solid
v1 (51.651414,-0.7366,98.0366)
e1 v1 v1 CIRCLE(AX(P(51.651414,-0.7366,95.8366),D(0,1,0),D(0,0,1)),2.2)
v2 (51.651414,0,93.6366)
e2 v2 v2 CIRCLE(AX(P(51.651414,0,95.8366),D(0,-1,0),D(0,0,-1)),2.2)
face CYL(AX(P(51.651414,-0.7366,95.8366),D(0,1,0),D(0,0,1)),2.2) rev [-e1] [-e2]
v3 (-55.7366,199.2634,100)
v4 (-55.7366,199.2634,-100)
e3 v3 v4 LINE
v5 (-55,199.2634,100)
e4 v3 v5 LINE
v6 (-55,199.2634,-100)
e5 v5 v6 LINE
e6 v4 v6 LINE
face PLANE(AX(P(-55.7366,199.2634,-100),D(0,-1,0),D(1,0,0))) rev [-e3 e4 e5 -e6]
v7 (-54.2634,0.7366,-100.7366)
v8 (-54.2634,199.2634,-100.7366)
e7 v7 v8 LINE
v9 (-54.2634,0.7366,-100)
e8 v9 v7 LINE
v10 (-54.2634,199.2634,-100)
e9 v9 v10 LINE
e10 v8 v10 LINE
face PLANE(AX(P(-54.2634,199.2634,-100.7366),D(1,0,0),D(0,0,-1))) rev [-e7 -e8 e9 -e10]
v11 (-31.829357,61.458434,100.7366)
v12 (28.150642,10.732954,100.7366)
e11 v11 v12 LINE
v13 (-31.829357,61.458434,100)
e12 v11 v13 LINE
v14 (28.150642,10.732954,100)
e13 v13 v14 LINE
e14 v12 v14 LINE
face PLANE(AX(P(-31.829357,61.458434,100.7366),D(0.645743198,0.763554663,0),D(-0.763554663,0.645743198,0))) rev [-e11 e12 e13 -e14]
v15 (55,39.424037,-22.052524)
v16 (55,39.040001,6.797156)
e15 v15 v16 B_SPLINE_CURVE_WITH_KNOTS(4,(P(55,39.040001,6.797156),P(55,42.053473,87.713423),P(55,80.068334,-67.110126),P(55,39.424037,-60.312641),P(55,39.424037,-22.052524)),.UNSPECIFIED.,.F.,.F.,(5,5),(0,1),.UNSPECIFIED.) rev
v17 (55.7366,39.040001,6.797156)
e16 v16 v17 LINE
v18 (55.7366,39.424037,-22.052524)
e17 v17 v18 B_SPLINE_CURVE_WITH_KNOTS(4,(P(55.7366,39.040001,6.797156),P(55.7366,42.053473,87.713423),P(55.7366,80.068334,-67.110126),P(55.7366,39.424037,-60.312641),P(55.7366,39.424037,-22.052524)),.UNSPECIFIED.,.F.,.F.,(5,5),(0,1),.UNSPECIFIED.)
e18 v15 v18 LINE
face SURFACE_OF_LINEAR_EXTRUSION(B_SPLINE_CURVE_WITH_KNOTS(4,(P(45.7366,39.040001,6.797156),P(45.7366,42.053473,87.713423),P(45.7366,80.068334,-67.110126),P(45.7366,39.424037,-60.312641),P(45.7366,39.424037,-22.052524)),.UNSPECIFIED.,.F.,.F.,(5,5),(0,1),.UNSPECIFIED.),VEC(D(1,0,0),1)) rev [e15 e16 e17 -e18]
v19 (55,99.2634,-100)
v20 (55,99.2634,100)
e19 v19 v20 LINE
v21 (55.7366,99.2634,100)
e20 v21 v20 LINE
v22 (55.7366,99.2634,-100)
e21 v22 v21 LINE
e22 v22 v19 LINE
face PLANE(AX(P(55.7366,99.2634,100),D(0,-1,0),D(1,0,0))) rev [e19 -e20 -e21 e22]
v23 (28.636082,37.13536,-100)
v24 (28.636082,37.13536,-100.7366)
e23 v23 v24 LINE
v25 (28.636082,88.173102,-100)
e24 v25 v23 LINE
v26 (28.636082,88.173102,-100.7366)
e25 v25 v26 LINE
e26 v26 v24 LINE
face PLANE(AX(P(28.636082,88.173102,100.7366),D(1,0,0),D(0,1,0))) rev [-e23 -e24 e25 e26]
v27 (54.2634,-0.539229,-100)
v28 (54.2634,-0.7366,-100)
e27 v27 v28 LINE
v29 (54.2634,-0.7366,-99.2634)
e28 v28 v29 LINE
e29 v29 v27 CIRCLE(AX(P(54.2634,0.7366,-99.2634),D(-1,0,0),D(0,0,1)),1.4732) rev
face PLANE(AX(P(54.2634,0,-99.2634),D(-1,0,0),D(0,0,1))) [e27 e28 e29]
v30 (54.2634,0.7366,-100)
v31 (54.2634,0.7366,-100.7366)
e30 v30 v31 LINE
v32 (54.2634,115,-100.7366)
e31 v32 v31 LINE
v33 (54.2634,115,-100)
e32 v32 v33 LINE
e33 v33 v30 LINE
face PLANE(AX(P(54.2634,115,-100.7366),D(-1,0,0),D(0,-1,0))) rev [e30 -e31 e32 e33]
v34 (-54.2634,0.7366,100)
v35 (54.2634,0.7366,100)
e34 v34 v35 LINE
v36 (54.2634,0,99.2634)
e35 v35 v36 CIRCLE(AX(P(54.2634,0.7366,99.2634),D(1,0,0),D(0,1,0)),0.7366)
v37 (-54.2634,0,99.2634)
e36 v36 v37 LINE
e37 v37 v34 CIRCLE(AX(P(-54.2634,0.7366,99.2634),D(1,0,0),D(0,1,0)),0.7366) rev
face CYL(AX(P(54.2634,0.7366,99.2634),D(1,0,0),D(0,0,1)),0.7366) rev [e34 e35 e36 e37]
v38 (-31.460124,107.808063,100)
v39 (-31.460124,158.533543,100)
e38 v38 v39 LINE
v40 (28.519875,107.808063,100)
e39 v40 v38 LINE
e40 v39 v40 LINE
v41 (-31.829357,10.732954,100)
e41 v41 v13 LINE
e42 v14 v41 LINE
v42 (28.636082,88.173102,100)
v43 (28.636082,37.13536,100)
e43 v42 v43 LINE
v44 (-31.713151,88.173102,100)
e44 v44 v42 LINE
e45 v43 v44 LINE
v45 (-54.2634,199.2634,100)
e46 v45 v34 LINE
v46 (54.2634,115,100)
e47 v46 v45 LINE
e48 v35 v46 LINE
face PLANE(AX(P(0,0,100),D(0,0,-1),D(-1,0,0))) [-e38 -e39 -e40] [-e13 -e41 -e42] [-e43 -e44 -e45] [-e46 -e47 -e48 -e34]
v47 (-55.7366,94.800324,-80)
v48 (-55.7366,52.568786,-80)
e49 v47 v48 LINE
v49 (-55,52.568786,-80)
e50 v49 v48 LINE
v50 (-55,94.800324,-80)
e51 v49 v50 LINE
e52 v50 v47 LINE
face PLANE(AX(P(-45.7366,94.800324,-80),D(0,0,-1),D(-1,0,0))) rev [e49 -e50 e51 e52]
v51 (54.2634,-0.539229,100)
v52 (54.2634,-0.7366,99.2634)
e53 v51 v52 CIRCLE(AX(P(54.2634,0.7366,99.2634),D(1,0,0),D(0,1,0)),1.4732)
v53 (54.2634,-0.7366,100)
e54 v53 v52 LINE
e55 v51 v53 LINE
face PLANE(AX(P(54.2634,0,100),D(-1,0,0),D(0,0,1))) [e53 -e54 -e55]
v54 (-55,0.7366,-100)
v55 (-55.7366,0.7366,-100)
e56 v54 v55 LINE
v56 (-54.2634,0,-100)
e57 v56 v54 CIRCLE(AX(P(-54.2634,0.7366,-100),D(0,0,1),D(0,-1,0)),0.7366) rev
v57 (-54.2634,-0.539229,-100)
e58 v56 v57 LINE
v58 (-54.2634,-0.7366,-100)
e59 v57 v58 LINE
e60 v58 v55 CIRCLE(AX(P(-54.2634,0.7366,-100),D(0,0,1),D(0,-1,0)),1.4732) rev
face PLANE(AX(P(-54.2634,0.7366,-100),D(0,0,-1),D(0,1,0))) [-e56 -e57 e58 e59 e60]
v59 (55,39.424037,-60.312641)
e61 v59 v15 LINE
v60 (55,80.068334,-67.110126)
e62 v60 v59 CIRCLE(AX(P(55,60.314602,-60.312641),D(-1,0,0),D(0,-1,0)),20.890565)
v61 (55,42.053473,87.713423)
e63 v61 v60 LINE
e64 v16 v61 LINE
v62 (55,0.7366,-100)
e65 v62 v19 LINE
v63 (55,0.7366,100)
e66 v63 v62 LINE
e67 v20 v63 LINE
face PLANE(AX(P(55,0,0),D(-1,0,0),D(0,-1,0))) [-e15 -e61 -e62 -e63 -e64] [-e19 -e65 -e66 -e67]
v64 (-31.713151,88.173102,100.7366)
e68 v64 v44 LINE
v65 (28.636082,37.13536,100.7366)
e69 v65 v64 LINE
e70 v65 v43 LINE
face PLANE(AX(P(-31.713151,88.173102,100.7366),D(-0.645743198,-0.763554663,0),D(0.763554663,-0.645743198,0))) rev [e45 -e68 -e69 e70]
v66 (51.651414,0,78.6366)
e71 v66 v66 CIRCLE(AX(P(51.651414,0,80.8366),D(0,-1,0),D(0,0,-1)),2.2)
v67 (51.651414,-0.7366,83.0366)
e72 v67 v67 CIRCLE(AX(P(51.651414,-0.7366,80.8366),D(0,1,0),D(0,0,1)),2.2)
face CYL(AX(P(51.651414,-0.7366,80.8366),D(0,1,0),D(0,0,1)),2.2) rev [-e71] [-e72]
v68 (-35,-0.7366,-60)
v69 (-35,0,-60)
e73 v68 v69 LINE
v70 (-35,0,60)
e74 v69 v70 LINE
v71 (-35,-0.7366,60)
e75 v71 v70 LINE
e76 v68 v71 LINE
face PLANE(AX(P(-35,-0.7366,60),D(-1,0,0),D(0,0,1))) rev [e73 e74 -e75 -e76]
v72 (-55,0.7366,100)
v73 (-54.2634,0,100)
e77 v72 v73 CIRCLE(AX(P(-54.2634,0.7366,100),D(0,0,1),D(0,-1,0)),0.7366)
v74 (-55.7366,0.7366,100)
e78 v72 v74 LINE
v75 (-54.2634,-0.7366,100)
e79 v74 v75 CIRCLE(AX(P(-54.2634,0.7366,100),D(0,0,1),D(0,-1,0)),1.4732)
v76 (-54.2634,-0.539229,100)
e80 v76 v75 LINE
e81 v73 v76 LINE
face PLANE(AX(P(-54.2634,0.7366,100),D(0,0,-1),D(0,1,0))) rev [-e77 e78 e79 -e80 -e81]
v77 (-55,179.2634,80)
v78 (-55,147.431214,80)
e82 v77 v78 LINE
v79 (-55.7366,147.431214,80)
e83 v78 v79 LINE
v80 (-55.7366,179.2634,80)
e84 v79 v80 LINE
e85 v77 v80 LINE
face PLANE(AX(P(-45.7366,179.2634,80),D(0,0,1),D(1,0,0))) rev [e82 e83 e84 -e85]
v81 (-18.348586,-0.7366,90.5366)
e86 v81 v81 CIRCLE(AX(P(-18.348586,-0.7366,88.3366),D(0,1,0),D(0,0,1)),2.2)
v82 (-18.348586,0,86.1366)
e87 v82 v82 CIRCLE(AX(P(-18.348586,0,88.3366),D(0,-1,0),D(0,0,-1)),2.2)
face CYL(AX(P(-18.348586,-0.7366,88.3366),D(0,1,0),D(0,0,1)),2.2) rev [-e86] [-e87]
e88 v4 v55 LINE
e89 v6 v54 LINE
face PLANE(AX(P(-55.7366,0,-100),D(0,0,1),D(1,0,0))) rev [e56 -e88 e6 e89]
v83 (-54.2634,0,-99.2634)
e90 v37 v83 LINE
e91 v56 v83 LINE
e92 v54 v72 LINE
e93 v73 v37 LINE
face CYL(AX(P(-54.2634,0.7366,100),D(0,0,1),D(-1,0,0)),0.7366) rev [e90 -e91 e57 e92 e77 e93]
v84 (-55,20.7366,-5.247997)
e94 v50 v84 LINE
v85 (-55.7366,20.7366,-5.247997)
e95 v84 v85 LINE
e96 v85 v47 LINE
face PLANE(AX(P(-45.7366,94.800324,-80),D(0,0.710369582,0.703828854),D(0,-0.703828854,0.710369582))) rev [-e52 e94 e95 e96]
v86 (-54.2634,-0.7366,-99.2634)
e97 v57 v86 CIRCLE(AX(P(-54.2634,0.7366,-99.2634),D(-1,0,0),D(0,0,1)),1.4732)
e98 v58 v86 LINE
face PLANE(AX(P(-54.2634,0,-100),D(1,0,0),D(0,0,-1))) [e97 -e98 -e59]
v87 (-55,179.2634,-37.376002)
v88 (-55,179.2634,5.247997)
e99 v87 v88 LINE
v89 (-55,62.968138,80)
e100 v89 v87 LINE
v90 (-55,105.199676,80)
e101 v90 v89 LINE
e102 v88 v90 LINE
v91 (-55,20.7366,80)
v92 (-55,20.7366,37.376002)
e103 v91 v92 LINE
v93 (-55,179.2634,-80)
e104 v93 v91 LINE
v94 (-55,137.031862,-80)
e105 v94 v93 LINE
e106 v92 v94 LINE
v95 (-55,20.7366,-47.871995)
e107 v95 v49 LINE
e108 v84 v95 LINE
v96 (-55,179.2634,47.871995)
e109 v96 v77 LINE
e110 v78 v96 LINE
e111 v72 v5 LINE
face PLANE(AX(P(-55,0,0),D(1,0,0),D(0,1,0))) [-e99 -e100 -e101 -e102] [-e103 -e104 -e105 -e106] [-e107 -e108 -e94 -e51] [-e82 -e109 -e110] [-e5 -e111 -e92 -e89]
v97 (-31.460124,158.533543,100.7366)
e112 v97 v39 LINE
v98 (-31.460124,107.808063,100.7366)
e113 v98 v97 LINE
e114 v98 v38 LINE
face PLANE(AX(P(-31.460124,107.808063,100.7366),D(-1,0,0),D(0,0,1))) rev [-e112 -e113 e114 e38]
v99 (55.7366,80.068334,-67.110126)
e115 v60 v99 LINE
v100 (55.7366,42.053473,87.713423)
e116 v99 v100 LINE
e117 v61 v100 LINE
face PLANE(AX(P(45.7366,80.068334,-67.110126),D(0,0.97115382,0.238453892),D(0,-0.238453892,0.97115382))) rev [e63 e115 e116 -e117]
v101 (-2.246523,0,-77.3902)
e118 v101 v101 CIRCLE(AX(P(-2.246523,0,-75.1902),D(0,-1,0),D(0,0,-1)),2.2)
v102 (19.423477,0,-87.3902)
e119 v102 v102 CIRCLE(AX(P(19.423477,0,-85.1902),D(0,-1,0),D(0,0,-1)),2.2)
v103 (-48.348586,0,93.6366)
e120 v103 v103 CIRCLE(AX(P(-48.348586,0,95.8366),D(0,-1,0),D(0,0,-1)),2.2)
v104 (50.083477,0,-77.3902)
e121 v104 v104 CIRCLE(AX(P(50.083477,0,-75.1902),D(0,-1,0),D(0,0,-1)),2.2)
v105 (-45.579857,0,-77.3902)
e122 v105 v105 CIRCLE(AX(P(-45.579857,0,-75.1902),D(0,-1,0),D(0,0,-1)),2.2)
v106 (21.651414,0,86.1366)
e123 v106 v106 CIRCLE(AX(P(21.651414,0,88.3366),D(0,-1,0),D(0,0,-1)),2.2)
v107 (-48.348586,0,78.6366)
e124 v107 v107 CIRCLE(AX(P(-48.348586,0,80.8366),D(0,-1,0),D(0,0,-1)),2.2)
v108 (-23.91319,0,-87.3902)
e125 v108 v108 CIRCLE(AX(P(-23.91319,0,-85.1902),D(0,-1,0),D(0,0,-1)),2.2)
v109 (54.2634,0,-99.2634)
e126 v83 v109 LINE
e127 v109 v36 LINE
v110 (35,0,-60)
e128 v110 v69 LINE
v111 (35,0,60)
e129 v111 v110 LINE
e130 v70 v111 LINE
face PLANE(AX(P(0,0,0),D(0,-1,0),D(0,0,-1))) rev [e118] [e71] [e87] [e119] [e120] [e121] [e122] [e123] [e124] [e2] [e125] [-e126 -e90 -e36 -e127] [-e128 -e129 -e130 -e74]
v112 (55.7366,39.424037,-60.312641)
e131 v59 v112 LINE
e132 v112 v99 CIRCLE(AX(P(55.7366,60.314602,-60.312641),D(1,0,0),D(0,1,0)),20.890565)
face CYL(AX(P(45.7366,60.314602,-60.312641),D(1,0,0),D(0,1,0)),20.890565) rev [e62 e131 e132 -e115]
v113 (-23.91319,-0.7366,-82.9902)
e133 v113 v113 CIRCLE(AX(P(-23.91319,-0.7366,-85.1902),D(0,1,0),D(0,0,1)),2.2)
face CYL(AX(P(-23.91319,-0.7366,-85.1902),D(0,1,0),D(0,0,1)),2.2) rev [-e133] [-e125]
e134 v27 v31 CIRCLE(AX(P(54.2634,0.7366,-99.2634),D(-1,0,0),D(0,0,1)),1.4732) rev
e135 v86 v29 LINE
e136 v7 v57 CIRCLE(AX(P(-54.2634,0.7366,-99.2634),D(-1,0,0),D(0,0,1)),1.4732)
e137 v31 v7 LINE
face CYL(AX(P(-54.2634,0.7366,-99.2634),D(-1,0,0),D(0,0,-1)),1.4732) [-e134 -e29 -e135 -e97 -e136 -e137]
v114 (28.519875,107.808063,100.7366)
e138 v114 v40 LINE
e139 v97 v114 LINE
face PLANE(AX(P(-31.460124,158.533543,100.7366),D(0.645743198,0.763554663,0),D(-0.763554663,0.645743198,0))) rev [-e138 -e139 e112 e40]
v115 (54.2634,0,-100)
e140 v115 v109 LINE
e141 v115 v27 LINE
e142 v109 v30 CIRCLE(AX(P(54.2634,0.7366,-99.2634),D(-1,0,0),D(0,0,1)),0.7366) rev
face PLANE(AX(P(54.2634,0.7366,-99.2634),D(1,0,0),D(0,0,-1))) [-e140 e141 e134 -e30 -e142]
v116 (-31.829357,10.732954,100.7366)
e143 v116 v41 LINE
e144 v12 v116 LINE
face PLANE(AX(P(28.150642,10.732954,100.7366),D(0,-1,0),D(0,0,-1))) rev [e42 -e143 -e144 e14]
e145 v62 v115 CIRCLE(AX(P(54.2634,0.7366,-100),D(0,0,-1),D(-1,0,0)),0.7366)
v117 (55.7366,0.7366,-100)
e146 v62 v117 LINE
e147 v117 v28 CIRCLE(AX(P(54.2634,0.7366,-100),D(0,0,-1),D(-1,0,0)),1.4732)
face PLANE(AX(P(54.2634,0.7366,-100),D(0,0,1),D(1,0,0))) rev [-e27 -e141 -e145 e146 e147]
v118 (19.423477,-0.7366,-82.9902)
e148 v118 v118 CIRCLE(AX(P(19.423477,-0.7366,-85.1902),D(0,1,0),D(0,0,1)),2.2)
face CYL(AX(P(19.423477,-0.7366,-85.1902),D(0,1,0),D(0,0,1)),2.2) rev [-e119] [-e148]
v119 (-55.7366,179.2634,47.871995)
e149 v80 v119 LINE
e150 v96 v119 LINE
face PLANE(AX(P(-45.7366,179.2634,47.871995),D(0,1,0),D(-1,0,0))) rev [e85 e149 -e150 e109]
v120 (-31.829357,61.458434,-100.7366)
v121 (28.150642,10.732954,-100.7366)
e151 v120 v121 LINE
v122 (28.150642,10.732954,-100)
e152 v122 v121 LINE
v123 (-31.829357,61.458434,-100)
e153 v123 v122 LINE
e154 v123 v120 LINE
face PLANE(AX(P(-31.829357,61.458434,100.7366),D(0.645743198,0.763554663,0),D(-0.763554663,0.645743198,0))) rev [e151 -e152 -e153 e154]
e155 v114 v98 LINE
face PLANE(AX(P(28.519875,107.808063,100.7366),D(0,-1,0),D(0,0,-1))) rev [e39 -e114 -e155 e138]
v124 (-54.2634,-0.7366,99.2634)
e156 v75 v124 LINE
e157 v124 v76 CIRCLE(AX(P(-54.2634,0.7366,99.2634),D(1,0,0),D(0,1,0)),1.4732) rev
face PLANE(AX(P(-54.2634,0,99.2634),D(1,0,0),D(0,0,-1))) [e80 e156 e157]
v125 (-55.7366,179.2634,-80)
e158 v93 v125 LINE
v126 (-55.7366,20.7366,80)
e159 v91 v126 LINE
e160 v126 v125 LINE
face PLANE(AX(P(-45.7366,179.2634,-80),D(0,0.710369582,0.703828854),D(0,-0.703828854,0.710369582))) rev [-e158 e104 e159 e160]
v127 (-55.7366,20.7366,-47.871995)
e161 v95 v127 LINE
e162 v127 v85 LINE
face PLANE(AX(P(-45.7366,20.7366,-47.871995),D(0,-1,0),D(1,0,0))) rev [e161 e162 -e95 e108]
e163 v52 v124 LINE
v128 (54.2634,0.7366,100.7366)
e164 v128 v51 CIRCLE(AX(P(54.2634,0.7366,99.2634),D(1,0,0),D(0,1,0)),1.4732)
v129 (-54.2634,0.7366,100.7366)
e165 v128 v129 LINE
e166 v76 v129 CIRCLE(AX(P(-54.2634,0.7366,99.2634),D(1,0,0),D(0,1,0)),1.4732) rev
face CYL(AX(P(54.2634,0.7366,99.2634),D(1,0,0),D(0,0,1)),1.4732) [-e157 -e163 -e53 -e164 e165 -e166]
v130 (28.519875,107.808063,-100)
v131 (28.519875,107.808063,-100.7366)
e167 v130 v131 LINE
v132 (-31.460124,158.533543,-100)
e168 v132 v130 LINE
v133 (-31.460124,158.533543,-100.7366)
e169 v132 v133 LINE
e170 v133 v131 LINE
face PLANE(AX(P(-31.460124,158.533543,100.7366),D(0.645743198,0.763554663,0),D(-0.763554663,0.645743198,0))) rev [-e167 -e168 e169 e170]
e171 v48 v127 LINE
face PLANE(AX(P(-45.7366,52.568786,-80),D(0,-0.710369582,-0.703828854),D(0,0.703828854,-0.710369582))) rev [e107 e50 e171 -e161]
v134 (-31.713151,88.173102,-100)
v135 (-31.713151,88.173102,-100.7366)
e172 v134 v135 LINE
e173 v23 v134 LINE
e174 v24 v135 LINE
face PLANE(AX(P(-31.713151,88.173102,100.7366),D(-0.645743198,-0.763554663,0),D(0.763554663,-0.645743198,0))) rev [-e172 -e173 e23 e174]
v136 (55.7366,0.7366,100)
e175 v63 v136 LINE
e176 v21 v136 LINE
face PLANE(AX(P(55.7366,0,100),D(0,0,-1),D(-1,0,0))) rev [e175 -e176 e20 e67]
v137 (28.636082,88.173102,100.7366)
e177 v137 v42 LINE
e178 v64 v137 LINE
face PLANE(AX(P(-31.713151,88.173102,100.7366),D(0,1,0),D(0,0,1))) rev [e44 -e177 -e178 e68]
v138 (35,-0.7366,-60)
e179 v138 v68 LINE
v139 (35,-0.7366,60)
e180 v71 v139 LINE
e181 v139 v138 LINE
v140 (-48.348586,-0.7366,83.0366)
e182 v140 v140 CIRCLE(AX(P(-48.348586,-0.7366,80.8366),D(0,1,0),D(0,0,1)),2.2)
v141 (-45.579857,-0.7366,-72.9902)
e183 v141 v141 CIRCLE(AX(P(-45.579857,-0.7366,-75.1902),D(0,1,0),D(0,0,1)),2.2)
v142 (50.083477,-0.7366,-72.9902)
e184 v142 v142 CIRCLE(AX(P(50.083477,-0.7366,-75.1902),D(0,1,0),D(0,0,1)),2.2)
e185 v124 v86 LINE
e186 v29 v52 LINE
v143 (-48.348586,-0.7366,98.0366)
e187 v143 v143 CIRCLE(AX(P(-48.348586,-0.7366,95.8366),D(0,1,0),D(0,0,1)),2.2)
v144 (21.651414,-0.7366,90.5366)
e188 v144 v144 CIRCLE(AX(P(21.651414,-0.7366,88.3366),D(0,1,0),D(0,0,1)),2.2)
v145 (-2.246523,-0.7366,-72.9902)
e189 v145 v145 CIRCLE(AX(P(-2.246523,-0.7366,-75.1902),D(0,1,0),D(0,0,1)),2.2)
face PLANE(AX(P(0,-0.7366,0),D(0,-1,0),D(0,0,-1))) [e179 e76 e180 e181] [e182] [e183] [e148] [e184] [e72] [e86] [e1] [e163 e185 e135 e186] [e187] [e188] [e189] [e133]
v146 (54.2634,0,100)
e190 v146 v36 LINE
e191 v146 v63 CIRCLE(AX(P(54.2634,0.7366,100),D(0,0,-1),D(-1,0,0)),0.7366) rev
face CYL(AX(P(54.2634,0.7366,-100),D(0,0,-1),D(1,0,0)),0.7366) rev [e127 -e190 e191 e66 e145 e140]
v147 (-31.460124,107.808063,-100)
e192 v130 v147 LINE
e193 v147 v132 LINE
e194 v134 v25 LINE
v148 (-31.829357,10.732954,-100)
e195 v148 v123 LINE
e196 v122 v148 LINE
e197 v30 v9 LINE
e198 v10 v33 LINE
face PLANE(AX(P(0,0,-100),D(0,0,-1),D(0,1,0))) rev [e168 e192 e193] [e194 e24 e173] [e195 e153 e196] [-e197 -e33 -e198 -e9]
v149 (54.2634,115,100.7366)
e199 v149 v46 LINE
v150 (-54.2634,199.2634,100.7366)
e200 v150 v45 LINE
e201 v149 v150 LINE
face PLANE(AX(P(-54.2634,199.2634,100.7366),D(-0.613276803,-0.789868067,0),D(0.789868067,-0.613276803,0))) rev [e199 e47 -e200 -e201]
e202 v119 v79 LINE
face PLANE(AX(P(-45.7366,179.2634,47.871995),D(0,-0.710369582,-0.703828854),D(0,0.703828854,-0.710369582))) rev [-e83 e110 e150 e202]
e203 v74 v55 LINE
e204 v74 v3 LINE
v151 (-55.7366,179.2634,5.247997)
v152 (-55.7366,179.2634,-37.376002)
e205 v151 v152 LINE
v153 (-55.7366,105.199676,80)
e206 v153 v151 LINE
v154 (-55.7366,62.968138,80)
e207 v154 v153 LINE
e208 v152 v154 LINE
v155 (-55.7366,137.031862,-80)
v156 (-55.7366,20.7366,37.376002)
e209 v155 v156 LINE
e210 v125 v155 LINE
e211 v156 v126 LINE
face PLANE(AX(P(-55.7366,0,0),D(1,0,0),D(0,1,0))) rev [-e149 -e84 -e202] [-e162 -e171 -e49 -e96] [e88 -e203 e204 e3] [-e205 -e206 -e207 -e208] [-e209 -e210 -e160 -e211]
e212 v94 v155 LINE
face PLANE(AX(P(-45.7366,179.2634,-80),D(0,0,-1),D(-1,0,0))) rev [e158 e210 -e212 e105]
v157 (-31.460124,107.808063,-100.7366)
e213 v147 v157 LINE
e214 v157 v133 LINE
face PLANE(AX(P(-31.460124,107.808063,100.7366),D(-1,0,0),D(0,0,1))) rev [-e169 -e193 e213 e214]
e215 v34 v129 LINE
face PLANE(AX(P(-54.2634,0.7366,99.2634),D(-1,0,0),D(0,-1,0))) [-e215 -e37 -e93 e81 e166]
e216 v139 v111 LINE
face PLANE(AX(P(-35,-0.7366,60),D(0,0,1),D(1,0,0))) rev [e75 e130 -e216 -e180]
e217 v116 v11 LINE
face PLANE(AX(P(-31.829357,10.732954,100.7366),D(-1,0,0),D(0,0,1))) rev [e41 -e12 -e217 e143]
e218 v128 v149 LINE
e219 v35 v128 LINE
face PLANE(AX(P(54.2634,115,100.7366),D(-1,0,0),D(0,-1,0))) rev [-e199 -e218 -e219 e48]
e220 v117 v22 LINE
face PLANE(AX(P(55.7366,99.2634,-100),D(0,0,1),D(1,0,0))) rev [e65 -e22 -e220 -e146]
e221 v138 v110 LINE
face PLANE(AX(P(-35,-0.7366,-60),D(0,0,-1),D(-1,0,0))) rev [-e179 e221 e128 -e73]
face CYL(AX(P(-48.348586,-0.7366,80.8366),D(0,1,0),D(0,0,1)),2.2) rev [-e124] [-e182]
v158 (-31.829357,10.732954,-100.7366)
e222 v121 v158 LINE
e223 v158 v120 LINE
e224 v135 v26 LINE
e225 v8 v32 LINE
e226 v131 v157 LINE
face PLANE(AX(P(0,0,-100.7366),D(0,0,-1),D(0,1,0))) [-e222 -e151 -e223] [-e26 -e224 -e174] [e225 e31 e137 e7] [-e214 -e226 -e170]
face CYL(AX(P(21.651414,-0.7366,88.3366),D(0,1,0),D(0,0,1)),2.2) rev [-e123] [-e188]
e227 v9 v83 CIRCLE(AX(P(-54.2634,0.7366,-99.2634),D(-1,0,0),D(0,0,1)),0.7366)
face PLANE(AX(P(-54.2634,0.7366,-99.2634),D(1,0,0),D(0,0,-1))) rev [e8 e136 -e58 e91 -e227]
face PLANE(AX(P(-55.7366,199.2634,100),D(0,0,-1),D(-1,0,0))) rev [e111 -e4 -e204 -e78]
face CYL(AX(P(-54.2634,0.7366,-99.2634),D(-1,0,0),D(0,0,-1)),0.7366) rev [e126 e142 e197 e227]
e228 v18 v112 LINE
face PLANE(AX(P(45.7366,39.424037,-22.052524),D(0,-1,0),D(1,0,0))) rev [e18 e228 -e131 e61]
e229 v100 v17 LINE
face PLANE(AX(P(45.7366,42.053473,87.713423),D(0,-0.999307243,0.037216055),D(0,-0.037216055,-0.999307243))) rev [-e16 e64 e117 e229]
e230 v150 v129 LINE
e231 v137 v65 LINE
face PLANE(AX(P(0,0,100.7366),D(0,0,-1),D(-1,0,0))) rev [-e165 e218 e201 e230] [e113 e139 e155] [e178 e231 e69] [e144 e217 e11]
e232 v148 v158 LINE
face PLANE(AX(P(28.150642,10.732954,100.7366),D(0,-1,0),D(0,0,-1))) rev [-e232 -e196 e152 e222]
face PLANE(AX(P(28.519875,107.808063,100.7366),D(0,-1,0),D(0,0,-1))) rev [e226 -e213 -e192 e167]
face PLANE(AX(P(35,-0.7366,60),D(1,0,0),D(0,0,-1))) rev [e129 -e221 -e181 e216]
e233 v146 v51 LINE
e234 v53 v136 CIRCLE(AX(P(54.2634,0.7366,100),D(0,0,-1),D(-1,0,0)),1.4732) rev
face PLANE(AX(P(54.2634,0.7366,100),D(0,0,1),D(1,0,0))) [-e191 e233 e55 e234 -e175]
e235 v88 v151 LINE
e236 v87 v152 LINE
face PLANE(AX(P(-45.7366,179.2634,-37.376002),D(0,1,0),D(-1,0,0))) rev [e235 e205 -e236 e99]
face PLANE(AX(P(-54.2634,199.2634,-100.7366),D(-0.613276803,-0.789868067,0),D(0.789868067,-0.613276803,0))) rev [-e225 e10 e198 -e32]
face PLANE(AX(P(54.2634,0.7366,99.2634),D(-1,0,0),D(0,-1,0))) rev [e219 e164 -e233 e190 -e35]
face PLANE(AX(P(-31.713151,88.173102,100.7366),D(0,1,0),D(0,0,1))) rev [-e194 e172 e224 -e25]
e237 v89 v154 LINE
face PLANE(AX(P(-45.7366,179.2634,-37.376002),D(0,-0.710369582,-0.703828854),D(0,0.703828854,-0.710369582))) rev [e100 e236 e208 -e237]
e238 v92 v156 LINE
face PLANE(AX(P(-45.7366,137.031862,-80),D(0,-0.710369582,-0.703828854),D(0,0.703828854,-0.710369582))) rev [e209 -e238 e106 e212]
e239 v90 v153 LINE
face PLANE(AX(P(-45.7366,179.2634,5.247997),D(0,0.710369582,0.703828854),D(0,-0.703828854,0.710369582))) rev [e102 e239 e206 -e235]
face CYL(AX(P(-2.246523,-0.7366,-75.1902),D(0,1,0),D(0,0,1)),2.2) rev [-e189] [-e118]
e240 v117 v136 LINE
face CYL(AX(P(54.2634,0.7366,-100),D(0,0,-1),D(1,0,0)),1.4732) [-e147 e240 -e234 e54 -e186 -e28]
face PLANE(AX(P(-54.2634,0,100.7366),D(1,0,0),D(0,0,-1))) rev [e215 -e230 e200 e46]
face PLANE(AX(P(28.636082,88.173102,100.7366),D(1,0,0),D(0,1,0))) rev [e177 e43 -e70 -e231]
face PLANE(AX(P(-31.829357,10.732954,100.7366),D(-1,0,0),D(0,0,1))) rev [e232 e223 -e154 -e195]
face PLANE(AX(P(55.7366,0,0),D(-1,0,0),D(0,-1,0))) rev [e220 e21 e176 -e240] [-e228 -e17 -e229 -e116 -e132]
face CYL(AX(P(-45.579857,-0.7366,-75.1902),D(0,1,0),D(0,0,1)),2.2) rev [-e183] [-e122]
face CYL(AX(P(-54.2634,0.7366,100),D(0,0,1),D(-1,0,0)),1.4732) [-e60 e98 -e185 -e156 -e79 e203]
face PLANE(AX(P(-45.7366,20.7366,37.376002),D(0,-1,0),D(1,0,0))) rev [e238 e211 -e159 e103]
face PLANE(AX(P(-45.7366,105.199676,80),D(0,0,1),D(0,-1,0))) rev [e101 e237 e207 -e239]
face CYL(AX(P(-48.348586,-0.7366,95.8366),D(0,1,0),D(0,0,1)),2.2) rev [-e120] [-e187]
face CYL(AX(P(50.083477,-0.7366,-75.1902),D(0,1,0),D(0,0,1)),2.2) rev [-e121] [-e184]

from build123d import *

# Parameters (mm, degrees)
SKETCH1_W                    = 110
SKETCH1_H                    = 200
SKETCH1_W_2                  = 70
SKETCH1_H_2                  = 120
BASE_FLANGE1_DEPTH           = 0.7366
EDGE_FLANGE1_STRIP_W         = 4.4196
EDGE_FLANGE1_STRIP_H         = 0.7366
EDGE_FLANGE1_STRIP_CUT_DEPTH = 200
EDGE_FLANGE1_DEPTH           = 200
EDGE_FLANGE2_STRIP_W         = 4.4196
EDGE_FLANGE2_STRIP_H         = 0.7366
EDGE_FLANGE2_STRIP_CUT_DEPTH = 200
EDGE_FLANGE2_DEPTH           = 200
EDGE_FLANGE3_STRIP_W         = 4.4196
EDGE_FLANGE3_STRIP_H         = 0.7366
EDGE_FLANGE3_STRIP_CUT_DEPTH = 108.5268
EDGE_FLANGE3_DEPTH           = 108.5268
EDGE_FLANGE3_START           = 0.7366
EDGE_FLANGE3_FLAT_DEPTH      = 0.7366
EDGE_FLANGE4_STRIP_W         = 4.4196
EDGE_FLANGE4_STRIP_H         = 0.7366
EDGE_FLANGE4_STRIP_CUT_DEPTH = 108.5268
EDGE_FLANGE4_DEPTH           = 108.5268
EDGE_FLANGE4_START           = 0.7366
EDGE_FLANGE4_FLAT_DEPTH      = 0.7366
CUT_EXTRUDE2_DEPTH           = 289.797370967
CUT_EXTRUDE3_START           = -0.7366
CUT_EXTRUDE3_DEPTH           = 0.7366
CUT_EXTRUDE6_DEPTH           = 800.082459726
CUT_EXTRUDE6_DEPTH_BACK      = 800.082459726
SKETCH53_R                   = 2.2
SKETCH53_R_2                 = 2.199999998
CUT_EXTRUDE7_DEPTH           = 10


# Read off the part's stored shape, not the designer's step: Cut-Extrude3
# Sheet-metal steps are written as plain solids
with BuildPart() as part:
    # Sketch1 → Base-Flange1 (new body)
    with BuildSketch(Plane(origin=(0, 0, 0), x_dir=(1, 0, 0), z_dir=(0, 1, 0))):
        Rectangle(SKETCH1_W, SKETCH1_H)
        Rectangle(SKETCH1_W_2, SKETCH1_H_2, mode=Mode.SUBTRACT)
    extrude(amount=-BASE_FLANGE1_DEPTH)

    # Edge-Flange1 strip (across the edge) → Edge-Flange1 strip cut (cut)
    with BuildSketch(Plane(origin=(-55, 0, -100), x_dir=(1, 0, 0), z_dir=(0, 0, 1))):
        with Locations((-1.4732, -0.3683)):
            Rectangle(EDGE_FLANGE1_STRIP_W, EDGE_FLANGE1_STRIP_H)
    extrude(amount=EDGE_FLANGE1_STRIP_CUT_DEPTH, mode=Mode.SUBTRACT)

    # Edge-Flange1 section (across the edge) → Edge-Flange1 (add)
    with BuildSketch(Plane(origin=(-55, 0, -100), x_dir=(1, 0, 0), z_dir=(0, 0, 1))):
        with BuildLine():
            Line((-0.7366, 0.7366), (-0.7366, 199.2634))
            Line((-0.7366, 199.2634), (0, 199.2634))
            Line((0, 199.2634), (0, 0.7366))
            ThreePointArc((0, 0.7366), (0.215745145, 0.215745145), (0.7366, 0))
            Line((0.7366, 0), (0.7366, -0.7366))
            ThreePointArc((0.7366, -0.7366), (-0.30510971, -0.30510971), (-0.7366, 0.7366))
        make_face()
    extrude(amount=EDGE_FLANGE1_DEPTH)

    # Edge-Flange2 strip (across the edge) → Edge-Flange2 strip cut (cut)
    with BuildSketch(Plane(origin=(55, 0, 100), x_dir=(-1, 0, 0), z_dir=(0, 0, -1))):
        with Locations((-1.4732, -0.3683)):
            Rectangle(EDGE_FLANGE2_STRIP_W, EDGE_FLANGE2_STRIP_H)
    extrude(amount=EDGE_FLANGE2_STRIP_CUT_DEPTH, mode=Mode.SUBTRACT)

    # Edge-Flange2 section (across the edge) → Edge-Flange2 (add)
    with BuildSketch(Plane(origin=(55, 0, 100), x_dir=(-1, 0, 0), z_dir=(0, 0, -1))):
        with BuildLine():
            Line((-0.7366, 0.7366), (-0.7366, 99.2634))
            Line((-0.7366, 99.2634), (0, 99.2634))
            Line((0, 99.2634), (0, 0.7366))
            ThreePointArc((0, 0.7366), (0.215745145, 0.215745145), (0.7366, 0))
            Line((0.7366, 0), (0.7366, -0.7366))
            ThreePointArc((0.7366, -0.7366), (-0.30510971, -0.30510971), (-0.7366, 0.7366))
        make_face()
    extrude(amount=EDGE_FLANGE2_DEPTH)

    # Edge-Flange3 strip (across the edge) → Edge-Flange3 strip cut (cut)
    with BuildSketch(Plane(origin=(54.2634, 0, -100), x_dir=(0, 0, 1), z_dir=(-1, 0, 0))):
        with Locations((-1.4732, -0.3683)):
            Rectangle(EDGE_FLANGE3_STRIP_W, EDGE_FLANGE3_STRIP_H)
    extrude(amount=EDGE_FLANGE3_STRIP_CUT_DEPTH, mode=Mode.SUBTRACT)

    # Edge-Flange3 bend section (across the edge) → Edge-Flange3 (add)
    with BuildSketch(Plane(origin=(54.2634, 0, -100), x_dir=(0, 0, 1), z_dir=(-1, 0, 0))):
        with BuildLine():
            Line((-0.7366, 0.7366), (0, 0.7366))
            ThreePointArc((0, 0.7366), (0.215745145, 0.215745145), (0.7366, 0))
            Line((0.7366, 0), (0.7366, -0.7366))
            ThreePointArc((0.7366, -0.7366), (-0.30510971, -0.30510971), (-0.7366, 0.7366))
        make_face()
    extrude(amount=EDGE_FLANGE3_DEPTH)

    # Edge-Flange3 profile (on flange) → Edge-Flange3 flat (add)
    with BuildSketch(Plane(origin=(0, 0, -100), x_dir=(-1, 0, 0), z_dir=(0, 0, -1)).offset(EDGE_FLANGE3_START)):
        Polygon((-54.2634, 115), (-54.2634, 0.7366), (54.2634, 0.7366), (54.2634, 199.2634), align=None)
    extrude(amount=-EDGE_FLANGE3_FLAT_DEPTH)

    # Edge-Flange4 strip (across the edge) → Edge-Flange4 strip cut (cut)
    with BuildSketch(Plane(origin=(-54.2634, 0, 100), x_dir=(0, 0, -1), z_dir=(1, 0, 0))):
        with Locations((-1.4732, -0.3683)):
            Rectangle(EDGE_FLANGE4_STRIP_W, EDGE_FLANGE4_STRIP_H)
    extrude(amount=EDGE_FLANGE4_STRIP_CUT_DEPTH, mode=Mode.SUBTRACT)

    # Edge-Flange4 bend section (across the edge) → Edge-Flange4 (add)
    with BuildSketch(Plane(origin=(-54.2634, 0, 100), x_dir=(0, 0, -1), z_dir=(1, 0, 0))):
        with BuildLine():
            Line((-0.7366, 0.7366), (0, 0.7366))
            ThreePointArc((0, 0.7366), (0.215745145, 0.215745145), (0.7366, 0))
            Line((0.7366, 0), (0.7366, -0.7366))
            ThreePointArc((0.7366, -0.7366), (-0.30510971, -0.30510971), (-0.7366, 0.7366))
        make_face()
    extrude(amount=EDGE_FLANGE4_DEPTH)

    # Edge-Flange4 profile (on flange) → Edge-Flange4 flat (add)
    with BuildSketch(Plane.XY.offset(100).offset(EDGE_FLANGE4_START)):
        Polygon((-54.2634, 199.2634), (-54.2634, 0.7366), (54.2634, 0.7366), (54.2634, 115), align=None)
    extrude(amount=-EDGE_FLANGE4_FLAT_DEPTH)

    # Sketch24 → Cut-Extrude2 (cut, through all)
    with BuildSketch(Plane(origin=(0, 0, -100.7366), x_dir=(-1, 0, 0), z_dir=(0, 0, -1))):
        Polygon((-28.519875042, 107.808063094), (31.460124178, 107.808063094), (31.460124178, 158.533542729), align=None)
        Polygon((-28.150641863, 10.732953924), (31.829357358, 10.732953924), (31.829357358, 61.45843356), align=None)
        Polygon((31.713150602, 88.173102361), (-28.636081798, 88.173102361), (-28.636081798, 37.135359798), align=None)
    extrude(amount=-CUT_EXTRUDE2_DEPTH, mode=Mode.SUBTRACT)

    # Cut-Extrude3 outline → Cut-Extrude3 (cut)
    with BuildSketch(Plane(origin=(55.7366, 0, 0), x_dir=(0, 0, -1), z_dir=(1, 0, 0)).offset(CUT_EXTRUDE3_START)):
        with BuildLine():
            Line((-87.713422796, 42.053472661), (-6.797155753, 39.040000774))
            add(Edge.make_bspline(
                [(-6.797155753, 39.040000774), (-87.713422796, 42.053472661), (67.110125935, 80.068334048), (60.312641059, 39.424036929), (22.052524279, 39.424036929)],
                knots=[0, 0, 0, 0, 0, 1, 1, 1, 1, 1], degree=4))
            Line((22.052524279, 39.424036929), (60.312641059, 39.424036929))
            ThreePointArc((60.312641059, 39.424036929), (80.917037974, 56.86865569), (67.110125935, 80.068334048))
            Line((67.110125935, 80.068334048), (-87.713422796, 42.053472661))
        make_face()
    extrude(amount=CUT_EXTRUDE3_DEPTH, mode=Mode.SUBTRACT)

    # Sketch53 → Cut-Extrude6 (cut, two sides: drawn at the far end of the back side and taken through both)
    with BuildSketch(Plane(origin=(344.115063699, 0, 561.793038506), x_dir=(-1, 0, 0), z_dir=(0, 1, 0)).offset(-CUT_EXTRUDE6_DEPTH_BACK)):
        with Locations(Location((392.463649434, -480.956438506, 0), (0, 0, 90))):
            Circle(SKETCH53_R)
        with Locations(Location((392.463649434, -465.956438506, 0), (0, 0, 90))):
            Circle(SKETCH53_R)
        with Locations(Location((362.463649434, -473.456438506, 0), (0, 0, 90))):
            Circle(SKETCH53_R)
        with Locations(Location((292.463649434, -480.956438506, 0), (0, 0, 90))):
            Circle(SKETCH53_R)
        with Locations(Location((292.463649434, -465.956438506, 0), (0, 0, 90))):
            Circle(SKETCH53_R)
        with Locations(Location((322.463649434, -473.456438506, 0), (0, 0, 90))):
            Circle(SKETCH53_R)
        with Locations(Location((294.03158687, -636.983238506, 0), (0, 0, 90))):
            Circle(SKETCH53_R_2)
        with Locations(Location((324.69158687, -646.983238506, 0), (0, 0, 90))):
            Circle(SKETCH53_R_2)
        with Locations(Location((346.36158687, -636.983238506, 0), (0, 0, 90))):
            Circle(SKETCH53_R_2)
        with Locations(Location((368.028253537, -646.983238506, 0), (0, 0, 90))):
            Circle(SKETCH53_R_2)
        with Locations(Location((389.694920203, -636.983238506, 0), (0, 0, 90))):
            Circle(SKETCH53_R_2)
    extrude(amount=CUT_EXTRUDE6_DEPTH + CUT_EXTRUDE6_DEPTH_BACK, mode=Mode.SUBTRACT)

    # Sketch54 → Cut-Extrude7 (cut)
    with BuildSketch(Plane.ZY.offset(55.7366)):
        Polygon((-37.376001553, 179.2634), (5.247996894, 179.2634), (80, 105.199675962), (80, 62.968137981), align=None)
        Polygon((-80, 179.2634), (-80, 137.031862019), (37.376001553, 20.7366), (80, 20.7366), align=None)
        Polygon((-47.87199534, 20.7366), (-5.247996894, 20.7366), (-80, 94.800324038), (-80, 52.568786057), align=None)
        Polygon((80, 179.2634), (80, 147.431213943), (47.87199534, 179.2634), align=None)
    extrude(amount=-CUT_EXTRUDE7_DEPTH, mode=Mode.SUBTRACT)


solid = part.part
